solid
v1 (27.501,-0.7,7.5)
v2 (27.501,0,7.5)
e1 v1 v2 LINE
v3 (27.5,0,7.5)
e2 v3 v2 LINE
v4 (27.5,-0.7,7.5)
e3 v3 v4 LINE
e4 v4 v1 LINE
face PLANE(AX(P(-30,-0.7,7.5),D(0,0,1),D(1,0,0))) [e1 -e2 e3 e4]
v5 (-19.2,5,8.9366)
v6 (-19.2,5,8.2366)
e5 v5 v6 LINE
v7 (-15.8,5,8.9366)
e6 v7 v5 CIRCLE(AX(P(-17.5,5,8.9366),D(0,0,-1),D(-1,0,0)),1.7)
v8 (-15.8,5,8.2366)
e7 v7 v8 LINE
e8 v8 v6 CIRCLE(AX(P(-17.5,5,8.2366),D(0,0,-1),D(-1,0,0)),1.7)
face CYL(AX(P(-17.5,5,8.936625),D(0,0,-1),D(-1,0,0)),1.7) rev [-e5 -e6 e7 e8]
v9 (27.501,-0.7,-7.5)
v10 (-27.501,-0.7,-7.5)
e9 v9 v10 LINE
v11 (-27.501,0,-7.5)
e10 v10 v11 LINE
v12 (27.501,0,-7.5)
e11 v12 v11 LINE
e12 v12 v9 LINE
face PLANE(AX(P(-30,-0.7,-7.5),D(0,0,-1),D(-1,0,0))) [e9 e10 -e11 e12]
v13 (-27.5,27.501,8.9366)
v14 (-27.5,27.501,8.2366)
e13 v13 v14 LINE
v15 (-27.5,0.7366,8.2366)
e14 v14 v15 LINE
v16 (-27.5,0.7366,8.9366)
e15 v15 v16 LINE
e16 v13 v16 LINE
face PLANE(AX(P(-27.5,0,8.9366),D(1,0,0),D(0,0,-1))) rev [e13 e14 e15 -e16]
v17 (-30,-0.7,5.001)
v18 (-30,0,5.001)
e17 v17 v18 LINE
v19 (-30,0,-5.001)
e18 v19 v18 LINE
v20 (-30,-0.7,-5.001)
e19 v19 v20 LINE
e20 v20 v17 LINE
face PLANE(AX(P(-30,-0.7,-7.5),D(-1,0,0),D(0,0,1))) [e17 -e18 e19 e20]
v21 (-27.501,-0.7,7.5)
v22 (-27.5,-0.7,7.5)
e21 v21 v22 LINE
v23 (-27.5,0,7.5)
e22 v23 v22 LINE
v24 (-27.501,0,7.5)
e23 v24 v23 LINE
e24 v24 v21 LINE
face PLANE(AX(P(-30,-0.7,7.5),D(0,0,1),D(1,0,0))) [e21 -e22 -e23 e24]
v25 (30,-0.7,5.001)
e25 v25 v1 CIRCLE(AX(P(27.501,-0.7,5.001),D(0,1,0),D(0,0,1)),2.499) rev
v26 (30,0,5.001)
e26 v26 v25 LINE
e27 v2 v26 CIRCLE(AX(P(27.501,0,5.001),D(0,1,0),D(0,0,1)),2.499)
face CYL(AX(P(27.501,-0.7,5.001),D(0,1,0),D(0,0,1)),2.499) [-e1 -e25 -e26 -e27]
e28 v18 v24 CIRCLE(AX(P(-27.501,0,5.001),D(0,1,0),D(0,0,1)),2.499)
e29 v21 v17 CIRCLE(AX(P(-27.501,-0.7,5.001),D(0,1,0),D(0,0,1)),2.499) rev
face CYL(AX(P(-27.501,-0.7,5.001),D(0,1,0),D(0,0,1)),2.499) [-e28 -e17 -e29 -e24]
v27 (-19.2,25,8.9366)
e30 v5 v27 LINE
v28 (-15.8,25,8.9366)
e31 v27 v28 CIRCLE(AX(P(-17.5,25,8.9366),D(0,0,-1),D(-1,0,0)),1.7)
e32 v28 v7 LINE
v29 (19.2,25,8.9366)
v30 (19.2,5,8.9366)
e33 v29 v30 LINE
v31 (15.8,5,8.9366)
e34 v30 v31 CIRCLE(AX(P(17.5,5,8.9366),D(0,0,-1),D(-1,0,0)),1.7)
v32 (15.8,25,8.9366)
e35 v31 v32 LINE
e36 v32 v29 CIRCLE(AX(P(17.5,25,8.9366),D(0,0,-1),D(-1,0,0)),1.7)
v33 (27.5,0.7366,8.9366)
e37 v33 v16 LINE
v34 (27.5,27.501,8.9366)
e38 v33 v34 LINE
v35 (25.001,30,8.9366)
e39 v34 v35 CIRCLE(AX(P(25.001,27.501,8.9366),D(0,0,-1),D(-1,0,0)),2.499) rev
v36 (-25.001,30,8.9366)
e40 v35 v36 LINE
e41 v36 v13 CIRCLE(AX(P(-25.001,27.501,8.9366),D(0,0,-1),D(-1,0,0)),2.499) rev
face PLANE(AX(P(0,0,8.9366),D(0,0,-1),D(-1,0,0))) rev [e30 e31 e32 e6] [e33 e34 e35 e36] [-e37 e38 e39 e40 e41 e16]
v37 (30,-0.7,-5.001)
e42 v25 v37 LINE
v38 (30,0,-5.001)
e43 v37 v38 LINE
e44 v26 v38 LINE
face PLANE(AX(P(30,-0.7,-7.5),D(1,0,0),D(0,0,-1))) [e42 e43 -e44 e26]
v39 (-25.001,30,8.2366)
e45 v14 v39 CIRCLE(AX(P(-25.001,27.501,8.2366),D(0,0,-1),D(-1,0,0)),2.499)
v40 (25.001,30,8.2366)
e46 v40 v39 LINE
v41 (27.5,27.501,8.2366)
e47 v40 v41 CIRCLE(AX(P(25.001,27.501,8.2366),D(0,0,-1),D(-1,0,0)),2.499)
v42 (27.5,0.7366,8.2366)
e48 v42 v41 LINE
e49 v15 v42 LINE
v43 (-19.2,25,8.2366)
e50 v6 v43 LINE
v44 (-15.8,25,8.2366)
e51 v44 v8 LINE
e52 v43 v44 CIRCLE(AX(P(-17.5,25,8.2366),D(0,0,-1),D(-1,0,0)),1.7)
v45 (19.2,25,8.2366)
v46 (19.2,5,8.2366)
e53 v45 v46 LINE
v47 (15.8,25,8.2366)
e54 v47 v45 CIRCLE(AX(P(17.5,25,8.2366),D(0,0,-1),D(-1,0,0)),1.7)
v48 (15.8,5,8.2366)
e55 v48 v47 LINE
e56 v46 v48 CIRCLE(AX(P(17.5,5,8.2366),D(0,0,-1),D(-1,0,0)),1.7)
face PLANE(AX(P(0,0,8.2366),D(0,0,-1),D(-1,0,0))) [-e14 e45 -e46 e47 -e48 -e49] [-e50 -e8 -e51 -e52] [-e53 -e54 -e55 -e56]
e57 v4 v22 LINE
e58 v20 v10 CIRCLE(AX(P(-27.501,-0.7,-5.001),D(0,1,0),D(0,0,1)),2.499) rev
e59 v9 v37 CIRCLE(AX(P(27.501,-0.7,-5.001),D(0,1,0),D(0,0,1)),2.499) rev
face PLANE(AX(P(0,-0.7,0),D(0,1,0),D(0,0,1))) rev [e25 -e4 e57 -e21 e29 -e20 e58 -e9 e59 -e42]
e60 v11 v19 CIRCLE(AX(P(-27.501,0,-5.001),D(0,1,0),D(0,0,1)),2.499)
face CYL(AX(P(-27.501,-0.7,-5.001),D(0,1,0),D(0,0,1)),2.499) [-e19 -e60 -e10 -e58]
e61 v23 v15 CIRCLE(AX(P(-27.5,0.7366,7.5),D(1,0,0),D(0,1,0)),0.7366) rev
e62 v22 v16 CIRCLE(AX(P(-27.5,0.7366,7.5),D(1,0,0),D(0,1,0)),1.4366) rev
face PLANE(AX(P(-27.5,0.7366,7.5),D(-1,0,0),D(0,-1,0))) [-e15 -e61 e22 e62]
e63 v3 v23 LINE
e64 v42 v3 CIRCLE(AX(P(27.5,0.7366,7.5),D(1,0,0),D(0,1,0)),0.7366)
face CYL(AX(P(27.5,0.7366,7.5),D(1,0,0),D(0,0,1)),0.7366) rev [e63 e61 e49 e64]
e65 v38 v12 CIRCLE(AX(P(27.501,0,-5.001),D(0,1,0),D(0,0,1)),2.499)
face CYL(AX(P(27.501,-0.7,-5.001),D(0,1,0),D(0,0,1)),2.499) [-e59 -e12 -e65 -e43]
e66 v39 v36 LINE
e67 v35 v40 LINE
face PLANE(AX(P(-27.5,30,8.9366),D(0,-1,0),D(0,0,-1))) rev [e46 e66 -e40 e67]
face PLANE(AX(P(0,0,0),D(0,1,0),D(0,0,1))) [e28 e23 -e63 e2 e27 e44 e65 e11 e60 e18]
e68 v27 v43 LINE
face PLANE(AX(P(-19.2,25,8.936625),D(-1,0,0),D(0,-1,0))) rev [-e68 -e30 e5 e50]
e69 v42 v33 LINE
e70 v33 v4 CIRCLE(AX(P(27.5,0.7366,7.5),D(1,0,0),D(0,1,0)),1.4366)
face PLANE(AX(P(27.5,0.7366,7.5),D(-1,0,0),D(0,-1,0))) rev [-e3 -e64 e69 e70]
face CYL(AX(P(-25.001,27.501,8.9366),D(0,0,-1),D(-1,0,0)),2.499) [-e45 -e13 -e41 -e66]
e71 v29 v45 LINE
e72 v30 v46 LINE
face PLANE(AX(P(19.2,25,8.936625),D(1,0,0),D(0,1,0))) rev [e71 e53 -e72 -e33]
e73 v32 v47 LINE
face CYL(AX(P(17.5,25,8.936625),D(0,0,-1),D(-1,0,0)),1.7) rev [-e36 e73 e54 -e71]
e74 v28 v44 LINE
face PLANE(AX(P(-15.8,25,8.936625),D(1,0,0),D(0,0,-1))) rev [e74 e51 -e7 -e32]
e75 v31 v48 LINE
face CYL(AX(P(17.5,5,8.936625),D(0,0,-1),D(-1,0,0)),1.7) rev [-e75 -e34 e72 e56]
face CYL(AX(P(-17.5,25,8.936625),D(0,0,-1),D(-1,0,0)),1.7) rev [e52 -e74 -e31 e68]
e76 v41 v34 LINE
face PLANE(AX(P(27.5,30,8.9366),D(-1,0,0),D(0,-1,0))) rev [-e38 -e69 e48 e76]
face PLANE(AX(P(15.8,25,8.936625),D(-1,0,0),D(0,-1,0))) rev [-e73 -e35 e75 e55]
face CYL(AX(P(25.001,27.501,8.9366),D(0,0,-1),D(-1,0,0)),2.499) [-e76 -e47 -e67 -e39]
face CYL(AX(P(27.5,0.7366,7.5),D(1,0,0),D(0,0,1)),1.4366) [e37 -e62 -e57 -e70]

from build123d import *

# Parameters (mm, degrees)
SKETCH1_W             = 60
SKETCH1_H             = 15
BASE_FLANGE1_DEPTH    = 0.7
EDGE_FLANGE1_DEPTH    = 55
CUT_EXTRUDE1_DEPTH    = 46.250862749
BREAK_CORNER1_START   = -0.7
BREAK_CORNER1_DEPTH   = 0.7
BREAK_CORNER1_START_2 = 8.2366
BREAK_CORNER1_2_DEPTH = 0.7


# Read off the part's stored shape, not the designer's step: Break-Corner1
# Sheet-metal steps are written as plain solids
with BuildPart() as part:
    # Sketch1 → Base-Flange1 (new body)
    with BuildSketch(Plane(origin=(0, 0, 0), x_dir=(1, 0, 0), z_dir=(0, 1, 0))):
        Rectangle(SKETCH1_W, SKETCH1_H)
    extrude(amount=-BASE_FLANGE1_DEPTH)

    # Edge-Flange1 section (across the edge) → Edge-Flange1 (add)
    with BuildSketch(Plane(origin=(-27.5, 0, 8.2366), x_dir=(0, 0, -1), z_dir=(1, 0, 0))):
        with BuildLine():
            Line((-0.7, 0.7366), (-0.7, 30))
            Line((-0.7, 30), (0, 30))
            Line((0, 30), (0, 0.7366))
            ThreePointArc((0, 0.7366), (0.215745145, 0.215745145), (0.7366, 0))
            Line((0.7366, 0), (0.7366, -0.7))
            ThreePointArc((0.7366, -0.7), (-0.279229602, -0.279229602), (-0.7, 0.7366))
        make_face()
    extrude(amount=EDGE_FLANGE1_DEPTH)

    # Sketch7 → Cut-Extrude1 (cut, through all)
    with BuildSketch(Plane(origin=(0, 0, 8.2366), x_dir=(-1, 0, 0), z_dir=(0, 0, -1))):
        with BuildLine():
            Line((-15.8, 25), (-15.8, 5))
            ThreePointArc((-15.8, 5), (-17.5, 3.3), (-19.2, 5))
            Line((-19.2, 5), (-19.2, 25))
            ThreePointArc((-19.2, 25), (-17.5, 26.7), (-15.8, 25))
        make_face()
        with BuildLine():
            Line((19.2, 25), (19.2, 5))
            ThreePointArc((19.2, 5), (17.5, 3.3), (15.8, 5))
            Line((15.8, 5), (15.8, 25))
            ThreePointArc((15.8, 25), (17.5, 26.7), (19.2, 25))
        make_face()
    extrude(amount=-CUT_EXTRUDE1_DEPTH, mode=Mode.SUBTRACT)

    # Break-Corner1 outline → Break-Corner1 (cut)
    with BuildSketch(Plane(origin=(0, 0, 0), x_dir=(1, 0, 0), z_dir=(0, 1, 0)).offset(BREAK_CORNER1_START)):
        with BuildLine():
            ThreePointArc((-27.501, -7.5), (-29.268059846, -6.768059846), (-30, -5.001))
            Line((-30, -5.001), (-30, -7.5))
            Line((-30, -7.5), (-27.501, -7.5))
        make_face()
        with BuildLine():
            ThreePointArc((-30, 5.001), (-29.268059846, 6.768059846), (-27.501, 7.5))
            Line((-27.501, 7.5), (-30, 7.5))
            Line((-30, 7.5), (-30, 5.001))
        make_face()
        with BuildLine():
            ThreePointArc((27.501, 7.5), (29.268059846, 6.768059846), (30, 5.001))
            Line((30, 5.001), (30, 7.5))
            Line((30, 7.5), (27.501, 7.5))
        make_face()
        with BuildLine():
            ThreePointArc((30, -5.001), (29.268059846, -6.768059846), (27.501, -7.5))
            Line((27.501, -7.5), (30, -7.5))
            Line((30, -7.5), (30, -5.001))
        make_face()
    extrude(amount=BREAK_CORNER1_DEPTH, mode=Mode.SUBTRACT)

    # Break-Corner1 2 outline → Break-Corner1 2 (cut)
    with BuildSketch(Plane.XY.offset(BREAK_CORNER1_START_2)):
        with BuildLine():
            Line((-27.5, 30), (-27.5, 27.501))
            ThreePointArc((-27.5, 27.501), (-26.768059846, 29.268059846), (-25.001, 30))
            Line((-25.001, 30), (-27.5, 30))
        make_face()
        with BuildLine():
            Line((27.5, 30), (25.001, 30))
            ThreePointArc((25.001, 30), (26.768059846, 29.268059846), (27.5, 27.501))
            Line((27.5, 27.501), (27.5, 30))
        make_face()
    extrude(amount=BREAK_CORNER1_2_DEPTH, mode=Mode.SUBTRACT)


solid = part.part
